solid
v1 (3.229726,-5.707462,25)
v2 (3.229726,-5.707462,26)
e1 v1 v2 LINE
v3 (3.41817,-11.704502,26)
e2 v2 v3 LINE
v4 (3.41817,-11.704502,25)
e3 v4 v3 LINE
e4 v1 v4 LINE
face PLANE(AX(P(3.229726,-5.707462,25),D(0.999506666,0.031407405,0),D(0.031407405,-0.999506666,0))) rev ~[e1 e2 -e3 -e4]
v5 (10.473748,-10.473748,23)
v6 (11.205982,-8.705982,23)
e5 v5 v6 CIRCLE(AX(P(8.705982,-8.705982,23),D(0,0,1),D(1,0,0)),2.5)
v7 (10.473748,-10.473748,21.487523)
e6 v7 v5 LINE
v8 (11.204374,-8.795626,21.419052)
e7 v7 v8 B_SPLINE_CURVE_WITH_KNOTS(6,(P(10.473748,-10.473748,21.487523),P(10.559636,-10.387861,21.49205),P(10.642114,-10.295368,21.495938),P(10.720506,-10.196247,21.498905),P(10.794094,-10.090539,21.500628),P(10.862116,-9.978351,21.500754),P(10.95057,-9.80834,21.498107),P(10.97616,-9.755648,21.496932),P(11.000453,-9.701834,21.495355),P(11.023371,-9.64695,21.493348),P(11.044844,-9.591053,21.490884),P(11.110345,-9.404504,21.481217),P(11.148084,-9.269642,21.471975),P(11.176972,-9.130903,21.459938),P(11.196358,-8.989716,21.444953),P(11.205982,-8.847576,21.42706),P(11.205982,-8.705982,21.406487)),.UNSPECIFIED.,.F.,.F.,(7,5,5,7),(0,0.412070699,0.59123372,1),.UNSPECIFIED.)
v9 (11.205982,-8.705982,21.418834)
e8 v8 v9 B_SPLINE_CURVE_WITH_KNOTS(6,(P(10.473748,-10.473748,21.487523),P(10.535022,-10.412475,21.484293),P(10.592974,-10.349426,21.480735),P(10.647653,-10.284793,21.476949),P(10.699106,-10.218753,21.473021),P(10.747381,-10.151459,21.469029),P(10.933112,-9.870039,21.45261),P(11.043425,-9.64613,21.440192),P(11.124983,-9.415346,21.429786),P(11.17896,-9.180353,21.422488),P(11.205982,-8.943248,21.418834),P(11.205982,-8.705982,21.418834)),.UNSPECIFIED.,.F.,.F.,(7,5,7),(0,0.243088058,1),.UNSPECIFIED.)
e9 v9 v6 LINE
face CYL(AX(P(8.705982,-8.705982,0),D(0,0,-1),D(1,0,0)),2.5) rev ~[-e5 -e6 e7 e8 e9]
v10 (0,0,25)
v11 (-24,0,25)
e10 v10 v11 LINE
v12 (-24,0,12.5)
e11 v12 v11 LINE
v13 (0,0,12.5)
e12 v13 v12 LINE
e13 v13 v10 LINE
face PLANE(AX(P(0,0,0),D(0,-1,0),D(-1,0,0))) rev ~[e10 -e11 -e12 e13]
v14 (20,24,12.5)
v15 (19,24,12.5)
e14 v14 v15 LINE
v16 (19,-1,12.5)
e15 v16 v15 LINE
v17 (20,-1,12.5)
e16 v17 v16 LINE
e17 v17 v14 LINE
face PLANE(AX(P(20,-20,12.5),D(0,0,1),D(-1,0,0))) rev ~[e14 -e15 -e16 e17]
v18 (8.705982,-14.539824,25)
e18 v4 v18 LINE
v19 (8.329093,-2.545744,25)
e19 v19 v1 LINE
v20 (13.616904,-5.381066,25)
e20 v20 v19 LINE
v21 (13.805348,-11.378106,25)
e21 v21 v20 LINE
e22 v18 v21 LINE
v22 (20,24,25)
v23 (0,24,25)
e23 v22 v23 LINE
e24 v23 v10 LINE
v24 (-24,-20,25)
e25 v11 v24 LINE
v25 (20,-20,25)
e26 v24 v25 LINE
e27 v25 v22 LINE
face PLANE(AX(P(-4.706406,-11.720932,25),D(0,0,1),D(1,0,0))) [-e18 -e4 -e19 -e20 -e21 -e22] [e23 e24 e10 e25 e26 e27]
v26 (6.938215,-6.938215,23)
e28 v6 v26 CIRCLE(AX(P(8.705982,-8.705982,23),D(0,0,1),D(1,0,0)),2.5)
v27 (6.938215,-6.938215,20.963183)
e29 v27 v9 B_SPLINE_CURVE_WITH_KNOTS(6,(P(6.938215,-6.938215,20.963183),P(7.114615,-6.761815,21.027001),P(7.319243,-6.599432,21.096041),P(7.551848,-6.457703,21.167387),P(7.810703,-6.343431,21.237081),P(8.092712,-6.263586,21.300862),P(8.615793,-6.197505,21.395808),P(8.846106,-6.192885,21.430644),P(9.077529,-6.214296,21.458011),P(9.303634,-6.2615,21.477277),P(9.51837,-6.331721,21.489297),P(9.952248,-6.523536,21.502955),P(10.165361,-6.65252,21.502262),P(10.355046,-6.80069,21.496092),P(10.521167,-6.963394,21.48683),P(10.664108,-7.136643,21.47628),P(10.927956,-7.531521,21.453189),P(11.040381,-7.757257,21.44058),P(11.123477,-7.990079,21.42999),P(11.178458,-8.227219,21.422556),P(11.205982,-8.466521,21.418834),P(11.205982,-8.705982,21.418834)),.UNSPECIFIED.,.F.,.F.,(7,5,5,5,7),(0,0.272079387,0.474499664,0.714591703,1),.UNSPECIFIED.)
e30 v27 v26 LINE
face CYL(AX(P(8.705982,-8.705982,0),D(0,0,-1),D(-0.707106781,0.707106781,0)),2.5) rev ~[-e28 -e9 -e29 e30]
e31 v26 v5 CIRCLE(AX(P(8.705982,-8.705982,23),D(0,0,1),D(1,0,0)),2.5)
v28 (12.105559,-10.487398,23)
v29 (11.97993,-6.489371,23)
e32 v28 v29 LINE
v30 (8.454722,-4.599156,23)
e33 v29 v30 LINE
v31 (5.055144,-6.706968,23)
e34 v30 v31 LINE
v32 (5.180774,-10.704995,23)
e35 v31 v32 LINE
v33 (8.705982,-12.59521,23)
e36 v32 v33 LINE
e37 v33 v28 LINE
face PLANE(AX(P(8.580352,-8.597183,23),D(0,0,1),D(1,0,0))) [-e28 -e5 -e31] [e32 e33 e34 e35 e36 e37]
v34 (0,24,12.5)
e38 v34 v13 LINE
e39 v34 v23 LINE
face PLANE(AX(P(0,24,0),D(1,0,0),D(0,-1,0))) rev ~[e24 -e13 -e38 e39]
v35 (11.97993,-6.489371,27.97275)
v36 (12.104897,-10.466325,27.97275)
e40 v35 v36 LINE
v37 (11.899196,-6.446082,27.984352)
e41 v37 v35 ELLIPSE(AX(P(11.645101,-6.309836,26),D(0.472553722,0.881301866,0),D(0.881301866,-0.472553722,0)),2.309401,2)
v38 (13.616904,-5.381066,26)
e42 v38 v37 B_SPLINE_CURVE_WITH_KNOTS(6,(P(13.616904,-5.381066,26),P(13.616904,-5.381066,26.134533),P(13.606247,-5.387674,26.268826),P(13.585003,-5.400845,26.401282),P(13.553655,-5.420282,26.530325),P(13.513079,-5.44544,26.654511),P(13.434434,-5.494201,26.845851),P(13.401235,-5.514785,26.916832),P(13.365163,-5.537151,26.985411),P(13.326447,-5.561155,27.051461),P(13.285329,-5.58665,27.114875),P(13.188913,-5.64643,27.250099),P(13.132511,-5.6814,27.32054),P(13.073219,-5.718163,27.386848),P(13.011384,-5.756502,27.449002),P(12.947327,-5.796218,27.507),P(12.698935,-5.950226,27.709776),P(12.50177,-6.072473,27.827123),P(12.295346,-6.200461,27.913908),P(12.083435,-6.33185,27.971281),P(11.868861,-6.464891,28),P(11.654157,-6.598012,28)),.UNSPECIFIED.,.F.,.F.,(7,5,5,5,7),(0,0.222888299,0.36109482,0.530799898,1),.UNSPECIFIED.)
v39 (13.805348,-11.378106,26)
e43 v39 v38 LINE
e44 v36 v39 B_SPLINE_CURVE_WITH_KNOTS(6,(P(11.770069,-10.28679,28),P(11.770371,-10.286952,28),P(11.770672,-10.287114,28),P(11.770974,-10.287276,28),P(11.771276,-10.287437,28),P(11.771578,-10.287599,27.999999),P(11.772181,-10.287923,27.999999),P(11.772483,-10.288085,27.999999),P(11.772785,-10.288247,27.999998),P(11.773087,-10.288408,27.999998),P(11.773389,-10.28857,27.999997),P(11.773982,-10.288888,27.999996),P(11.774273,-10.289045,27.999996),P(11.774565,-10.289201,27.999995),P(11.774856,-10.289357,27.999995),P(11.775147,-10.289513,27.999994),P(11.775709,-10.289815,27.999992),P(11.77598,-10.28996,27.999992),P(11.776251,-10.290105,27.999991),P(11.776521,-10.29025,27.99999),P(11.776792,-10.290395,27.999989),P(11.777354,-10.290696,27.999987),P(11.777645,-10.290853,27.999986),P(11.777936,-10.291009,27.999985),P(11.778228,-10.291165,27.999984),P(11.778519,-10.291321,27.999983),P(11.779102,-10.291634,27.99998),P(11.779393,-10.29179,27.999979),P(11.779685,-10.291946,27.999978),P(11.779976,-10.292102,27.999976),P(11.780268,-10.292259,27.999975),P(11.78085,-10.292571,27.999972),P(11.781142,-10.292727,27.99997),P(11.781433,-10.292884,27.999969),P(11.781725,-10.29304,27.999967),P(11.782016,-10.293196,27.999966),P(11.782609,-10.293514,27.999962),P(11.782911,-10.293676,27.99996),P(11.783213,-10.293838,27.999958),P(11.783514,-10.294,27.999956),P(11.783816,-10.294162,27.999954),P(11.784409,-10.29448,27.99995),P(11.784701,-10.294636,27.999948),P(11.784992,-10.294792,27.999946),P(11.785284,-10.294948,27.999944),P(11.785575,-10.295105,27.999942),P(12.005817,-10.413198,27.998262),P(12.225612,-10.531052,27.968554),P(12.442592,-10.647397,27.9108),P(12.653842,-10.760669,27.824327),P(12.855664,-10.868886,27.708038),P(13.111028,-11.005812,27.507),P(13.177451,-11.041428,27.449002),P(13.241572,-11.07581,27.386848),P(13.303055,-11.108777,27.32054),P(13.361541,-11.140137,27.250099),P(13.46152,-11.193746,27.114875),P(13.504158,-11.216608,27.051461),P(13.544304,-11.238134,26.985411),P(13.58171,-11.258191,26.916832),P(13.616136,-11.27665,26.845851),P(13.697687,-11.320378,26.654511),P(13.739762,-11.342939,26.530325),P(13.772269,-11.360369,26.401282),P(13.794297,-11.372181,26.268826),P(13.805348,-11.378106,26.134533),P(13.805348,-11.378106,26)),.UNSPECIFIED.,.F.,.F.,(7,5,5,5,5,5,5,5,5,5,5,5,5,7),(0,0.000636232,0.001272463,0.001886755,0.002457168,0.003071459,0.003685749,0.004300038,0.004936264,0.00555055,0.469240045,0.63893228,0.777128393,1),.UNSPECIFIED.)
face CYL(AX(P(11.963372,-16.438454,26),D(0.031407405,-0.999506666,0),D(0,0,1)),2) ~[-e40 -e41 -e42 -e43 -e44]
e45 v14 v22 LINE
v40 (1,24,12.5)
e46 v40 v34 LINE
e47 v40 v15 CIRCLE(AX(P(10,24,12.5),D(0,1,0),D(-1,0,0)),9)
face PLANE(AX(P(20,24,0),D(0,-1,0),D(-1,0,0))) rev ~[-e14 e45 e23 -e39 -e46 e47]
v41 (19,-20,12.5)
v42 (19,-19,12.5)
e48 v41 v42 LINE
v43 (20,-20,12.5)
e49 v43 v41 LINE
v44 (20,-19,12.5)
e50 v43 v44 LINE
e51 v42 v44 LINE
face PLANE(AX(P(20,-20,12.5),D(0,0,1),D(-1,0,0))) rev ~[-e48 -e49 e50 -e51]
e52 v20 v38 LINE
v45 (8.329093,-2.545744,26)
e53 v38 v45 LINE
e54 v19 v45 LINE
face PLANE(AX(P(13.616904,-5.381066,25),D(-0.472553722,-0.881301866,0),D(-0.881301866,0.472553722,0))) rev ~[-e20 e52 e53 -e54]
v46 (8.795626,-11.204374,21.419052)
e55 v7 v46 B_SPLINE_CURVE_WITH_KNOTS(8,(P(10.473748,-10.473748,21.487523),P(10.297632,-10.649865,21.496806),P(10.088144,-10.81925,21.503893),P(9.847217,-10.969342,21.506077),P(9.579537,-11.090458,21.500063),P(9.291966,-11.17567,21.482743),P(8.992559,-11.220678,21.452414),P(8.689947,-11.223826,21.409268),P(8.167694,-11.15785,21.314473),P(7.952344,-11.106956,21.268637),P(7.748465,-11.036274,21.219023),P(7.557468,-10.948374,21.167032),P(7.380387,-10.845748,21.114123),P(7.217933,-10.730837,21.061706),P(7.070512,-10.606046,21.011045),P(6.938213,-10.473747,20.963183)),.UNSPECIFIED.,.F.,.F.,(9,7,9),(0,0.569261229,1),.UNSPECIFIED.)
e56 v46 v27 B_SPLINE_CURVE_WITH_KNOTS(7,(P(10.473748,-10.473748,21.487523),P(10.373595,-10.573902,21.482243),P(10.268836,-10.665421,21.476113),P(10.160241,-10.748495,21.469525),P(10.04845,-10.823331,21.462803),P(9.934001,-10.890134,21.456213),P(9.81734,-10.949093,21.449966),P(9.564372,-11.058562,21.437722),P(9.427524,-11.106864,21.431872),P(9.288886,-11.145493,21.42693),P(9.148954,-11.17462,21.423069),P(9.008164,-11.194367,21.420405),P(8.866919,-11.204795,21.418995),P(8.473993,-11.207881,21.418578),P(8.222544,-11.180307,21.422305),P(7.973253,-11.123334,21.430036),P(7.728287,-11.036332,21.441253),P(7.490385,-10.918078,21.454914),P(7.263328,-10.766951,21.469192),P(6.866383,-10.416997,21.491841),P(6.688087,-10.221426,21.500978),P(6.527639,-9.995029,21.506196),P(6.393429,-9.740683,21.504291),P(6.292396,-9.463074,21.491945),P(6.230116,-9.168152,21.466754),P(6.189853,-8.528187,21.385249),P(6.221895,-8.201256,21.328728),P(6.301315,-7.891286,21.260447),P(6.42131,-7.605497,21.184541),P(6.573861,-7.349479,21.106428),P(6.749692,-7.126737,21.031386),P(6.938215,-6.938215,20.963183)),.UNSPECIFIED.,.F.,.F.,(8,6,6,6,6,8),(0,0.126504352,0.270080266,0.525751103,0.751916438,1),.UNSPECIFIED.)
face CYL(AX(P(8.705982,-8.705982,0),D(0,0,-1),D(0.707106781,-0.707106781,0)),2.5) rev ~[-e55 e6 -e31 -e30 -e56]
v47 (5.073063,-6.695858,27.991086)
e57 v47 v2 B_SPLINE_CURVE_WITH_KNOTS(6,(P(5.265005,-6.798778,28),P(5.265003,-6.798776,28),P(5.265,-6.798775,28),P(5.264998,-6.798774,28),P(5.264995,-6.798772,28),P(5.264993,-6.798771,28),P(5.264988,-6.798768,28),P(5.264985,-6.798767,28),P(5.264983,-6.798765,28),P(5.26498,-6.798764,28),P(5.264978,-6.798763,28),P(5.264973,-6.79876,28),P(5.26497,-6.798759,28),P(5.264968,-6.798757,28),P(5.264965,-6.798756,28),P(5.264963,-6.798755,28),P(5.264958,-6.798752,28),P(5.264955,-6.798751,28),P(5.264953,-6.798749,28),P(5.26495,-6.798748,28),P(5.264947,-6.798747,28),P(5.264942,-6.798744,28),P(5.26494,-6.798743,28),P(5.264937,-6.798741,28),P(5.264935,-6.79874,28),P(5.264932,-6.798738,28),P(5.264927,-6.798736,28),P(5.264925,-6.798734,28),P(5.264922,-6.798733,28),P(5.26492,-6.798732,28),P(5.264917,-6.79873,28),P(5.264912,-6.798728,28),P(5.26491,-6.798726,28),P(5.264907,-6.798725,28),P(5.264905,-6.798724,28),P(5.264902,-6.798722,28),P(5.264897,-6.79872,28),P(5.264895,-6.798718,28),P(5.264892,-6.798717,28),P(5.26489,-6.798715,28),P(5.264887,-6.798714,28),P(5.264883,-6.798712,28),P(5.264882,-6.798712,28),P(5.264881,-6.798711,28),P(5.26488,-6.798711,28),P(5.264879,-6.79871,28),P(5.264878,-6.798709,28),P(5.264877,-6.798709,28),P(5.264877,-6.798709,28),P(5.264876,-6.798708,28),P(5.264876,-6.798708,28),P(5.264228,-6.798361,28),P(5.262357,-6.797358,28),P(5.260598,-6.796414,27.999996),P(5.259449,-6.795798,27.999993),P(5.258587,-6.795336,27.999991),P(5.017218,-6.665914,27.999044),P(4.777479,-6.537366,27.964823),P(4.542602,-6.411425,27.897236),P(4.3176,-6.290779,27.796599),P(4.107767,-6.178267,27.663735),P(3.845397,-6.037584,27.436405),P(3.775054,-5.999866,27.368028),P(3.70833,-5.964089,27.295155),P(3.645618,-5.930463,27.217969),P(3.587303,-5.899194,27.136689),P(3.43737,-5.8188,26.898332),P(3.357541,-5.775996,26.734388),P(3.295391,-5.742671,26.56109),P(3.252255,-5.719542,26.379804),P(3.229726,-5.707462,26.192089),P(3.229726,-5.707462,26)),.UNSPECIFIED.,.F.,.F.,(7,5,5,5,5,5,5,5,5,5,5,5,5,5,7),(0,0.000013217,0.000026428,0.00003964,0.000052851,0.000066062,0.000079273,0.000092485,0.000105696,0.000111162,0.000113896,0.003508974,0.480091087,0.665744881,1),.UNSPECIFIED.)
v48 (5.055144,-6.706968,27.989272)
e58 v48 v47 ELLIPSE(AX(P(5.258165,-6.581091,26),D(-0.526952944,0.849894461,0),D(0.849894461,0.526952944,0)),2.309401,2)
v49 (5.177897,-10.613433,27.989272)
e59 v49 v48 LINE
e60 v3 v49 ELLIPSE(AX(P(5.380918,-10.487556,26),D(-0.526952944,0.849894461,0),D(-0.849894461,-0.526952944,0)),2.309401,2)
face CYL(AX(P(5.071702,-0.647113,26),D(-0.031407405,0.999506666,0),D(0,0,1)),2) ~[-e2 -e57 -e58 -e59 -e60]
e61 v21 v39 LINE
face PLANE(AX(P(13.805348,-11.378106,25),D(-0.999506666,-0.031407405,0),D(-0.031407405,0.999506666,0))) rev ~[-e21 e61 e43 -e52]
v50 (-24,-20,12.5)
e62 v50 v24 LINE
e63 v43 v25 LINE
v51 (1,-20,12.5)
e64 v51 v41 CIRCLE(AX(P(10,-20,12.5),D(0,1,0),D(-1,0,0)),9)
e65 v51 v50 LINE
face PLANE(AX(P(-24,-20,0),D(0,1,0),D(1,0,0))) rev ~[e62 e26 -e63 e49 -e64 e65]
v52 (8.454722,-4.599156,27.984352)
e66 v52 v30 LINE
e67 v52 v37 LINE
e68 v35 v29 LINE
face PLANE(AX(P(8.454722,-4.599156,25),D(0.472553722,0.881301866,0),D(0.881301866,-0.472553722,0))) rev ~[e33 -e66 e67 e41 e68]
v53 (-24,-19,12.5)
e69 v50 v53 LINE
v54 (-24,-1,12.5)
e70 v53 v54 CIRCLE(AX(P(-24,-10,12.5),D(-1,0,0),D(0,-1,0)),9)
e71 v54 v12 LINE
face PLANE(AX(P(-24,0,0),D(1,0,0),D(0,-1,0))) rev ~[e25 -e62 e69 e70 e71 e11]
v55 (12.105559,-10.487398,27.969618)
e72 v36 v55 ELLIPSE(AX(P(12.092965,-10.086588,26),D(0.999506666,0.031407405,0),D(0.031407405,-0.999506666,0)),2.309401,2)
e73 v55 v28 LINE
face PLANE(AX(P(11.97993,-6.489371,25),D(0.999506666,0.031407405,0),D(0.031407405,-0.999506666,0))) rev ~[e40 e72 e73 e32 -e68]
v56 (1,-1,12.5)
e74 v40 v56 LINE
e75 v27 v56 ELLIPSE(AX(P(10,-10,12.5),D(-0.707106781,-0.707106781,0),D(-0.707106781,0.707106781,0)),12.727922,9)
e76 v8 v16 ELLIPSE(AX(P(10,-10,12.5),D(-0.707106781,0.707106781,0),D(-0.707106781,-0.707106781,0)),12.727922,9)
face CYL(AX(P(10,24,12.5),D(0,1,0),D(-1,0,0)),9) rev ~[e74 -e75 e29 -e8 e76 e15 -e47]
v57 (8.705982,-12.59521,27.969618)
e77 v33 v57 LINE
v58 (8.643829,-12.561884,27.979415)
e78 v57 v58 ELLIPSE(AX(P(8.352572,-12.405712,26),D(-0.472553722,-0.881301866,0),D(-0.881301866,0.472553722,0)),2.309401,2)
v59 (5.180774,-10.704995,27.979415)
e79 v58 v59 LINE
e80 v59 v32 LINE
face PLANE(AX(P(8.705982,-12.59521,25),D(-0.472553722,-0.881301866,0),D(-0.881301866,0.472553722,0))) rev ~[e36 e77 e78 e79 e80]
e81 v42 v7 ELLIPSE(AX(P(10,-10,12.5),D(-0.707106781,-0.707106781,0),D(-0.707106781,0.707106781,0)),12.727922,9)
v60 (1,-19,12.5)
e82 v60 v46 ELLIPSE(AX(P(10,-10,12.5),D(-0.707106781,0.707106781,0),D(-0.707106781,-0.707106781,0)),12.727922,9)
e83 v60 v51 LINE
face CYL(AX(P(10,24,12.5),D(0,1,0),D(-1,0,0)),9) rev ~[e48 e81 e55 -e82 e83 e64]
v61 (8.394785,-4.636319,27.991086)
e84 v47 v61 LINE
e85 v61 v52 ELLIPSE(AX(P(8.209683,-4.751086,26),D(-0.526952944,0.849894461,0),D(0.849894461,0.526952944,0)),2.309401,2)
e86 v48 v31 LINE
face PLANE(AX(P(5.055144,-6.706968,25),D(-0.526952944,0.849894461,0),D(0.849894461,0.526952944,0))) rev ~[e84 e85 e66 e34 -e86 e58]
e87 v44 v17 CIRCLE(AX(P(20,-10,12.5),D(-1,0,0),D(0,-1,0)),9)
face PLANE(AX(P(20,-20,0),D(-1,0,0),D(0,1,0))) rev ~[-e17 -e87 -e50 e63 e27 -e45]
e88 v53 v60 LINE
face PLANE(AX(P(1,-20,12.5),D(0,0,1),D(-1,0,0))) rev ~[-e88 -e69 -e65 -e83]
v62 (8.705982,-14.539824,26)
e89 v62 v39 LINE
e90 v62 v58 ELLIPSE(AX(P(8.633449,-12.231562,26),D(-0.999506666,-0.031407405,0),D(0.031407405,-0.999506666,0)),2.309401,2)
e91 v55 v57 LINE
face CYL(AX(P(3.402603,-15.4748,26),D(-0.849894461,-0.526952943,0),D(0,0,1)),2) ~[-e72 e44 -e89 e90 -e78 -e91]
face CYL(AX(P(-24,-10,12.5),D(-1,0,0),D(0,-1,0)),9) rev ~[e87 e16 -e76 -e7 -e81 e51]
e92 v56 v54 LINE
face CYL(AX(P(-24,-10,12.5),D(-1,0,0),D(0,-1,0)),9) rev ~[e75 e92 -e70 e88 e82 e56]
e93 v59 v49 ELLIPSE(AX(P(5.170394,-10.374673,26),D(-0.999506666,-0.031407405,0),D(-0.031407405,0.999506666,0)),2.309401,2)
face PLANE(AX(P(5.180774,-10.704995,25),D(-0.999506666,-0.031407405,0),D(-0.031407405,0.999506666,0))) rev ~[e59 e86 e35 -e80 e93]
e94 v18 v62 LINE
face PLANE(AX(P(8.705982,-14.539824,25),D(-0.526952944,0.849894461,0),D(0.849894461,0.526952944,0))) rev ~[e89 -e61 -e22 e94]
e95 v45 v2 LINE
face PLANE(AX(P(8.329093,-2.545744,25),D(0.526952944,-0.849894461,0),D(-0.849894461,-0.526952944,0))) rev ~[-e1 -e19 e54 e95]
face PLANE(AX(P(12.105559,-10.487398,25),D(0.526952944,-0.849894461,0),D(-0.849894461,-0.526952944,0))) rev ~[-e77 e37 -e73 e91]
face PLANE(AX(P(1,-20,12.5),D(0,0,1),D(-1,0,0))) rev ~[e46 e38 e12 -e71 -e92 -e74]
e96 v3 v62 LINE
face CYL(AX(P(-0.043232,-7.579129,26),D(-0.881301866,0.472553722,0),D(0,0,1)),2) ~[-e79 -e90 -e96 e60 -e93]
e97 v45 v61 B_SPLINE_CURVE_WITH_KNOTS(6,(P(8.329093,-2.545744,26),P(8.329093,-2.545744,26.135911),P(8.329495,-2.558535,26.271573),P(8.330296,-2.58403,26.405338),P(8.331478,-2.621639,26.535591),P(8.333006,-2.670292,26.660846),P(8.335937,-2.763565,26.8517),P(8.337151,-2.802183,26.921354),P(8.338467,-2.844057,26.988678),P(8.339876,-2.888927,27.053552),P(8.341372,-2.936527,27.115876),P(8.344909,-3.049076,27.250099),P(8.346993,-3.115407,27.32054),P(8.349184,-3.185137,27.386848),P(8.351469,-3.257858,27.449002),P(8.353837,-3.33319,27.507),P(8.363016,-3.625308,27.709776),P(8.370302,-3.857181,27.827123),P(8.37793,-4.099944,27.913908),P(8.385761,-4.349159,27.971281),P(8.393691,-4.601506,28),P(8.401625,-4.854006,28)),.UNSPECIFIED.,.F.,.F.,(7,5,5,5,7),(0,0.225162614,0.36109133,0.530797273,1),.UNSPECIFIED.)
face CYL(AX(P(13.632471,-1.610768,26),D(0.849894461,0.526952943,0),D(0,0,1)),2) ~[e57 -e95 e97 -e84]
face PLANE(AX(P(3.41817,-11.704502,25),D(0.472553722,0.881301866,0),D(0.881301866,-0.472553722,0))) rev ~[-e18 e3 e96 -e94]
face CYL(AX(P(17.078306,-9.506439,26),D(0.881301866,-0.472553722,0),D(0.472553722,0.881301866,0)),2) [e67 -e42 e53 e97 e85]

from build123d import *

# Parameters (mm, degrees)
F1_DEPTH      = 25
F2_R          = 9
F3_DEPTH      = 44.001
F4_R          = 9
F5_DEPTH      = 44.001
F7_DEPTH      = 44.0010001
F8_R          = 2.5
F9_DEPTH      = 2
F10_DEPTH     = 3
F11_T1_DEPTH  = 16
F11_T3_DEPTH  = 16
F11_T5_DEPTH  = 16
F11_T7_DEPTH  = 16
F11_T9_DEPTH  = 16
F11_T11_DEPTH = 16


# Not quite as in the source:
# - a fillet or chamfer that OpenCascade refuses, or shapes differently, is made with other operations: its cross-section is extruded or revolved along the edge and cut away or added


with BuildPart() as f1:
    # F0 (on Top) → F1 (new body)
    with BuildSketch(Plane.XY):
        with BuildLine():
            Line((6.9382145885, -6.9382145885), (0, 0))
            Line((0, 0), (-24, 0))
            Line((-24, 0), (-24, -20))
            Line((-24, -20), (20, -20))
            Line((20, -20), (10.4737484944, -10.4737484944))
            ThreePointArc((10.4737484944, -10.4737484944), (6.9382145885, -10.4737484944), (6.9382145885, -6.9382145885))
        make_face()
        with BuildLine():
            Line((20, 24), (0, 24))
            Line((0, 24), (0, 0))
            Line((0, 0), (6.9382145885, -6.9382145885))
            ThreePointArc((6.9382145885, -6.9382145885), (9.6626901223, -6.3962827101), (11.2059815414, -8.7059815414))
            ThreePointArc((11.2059815414, -8.7059815414), (11.0156803727, -9.6626901223), (10.4737484944, -10.4737484944))
            Line((10.4737484944, -10.4737484944), (20, -20))
            Line((20, -20), (20, 24))
        make_face()
    extrude(amount=F1_DEPTH)

    # F2 (on face) → F3 (cut, through all)
    with BuildSketch(Plane(origin=(-24, 0, 0), x_dir=(0, -1, 0), z_dir=(-1, 0, 0))):
        with Locations((10, 12.5)):
            Circle(F2_R)
    extrude(amount=-F3_DEPTH, mode=Mode.SUBTRACT)

    # F4 (on face) → F5 (cut, through all)
    with BuildSketch(Plane(origin=(0, 24, 0), x_dir=(-1, 0, 0), z_dir=(0, 1, 0))):
        with Locations((-10, 12.5)):
            Circle(F4_R)
    extrude(amount=-F5_DEPTH, mode=Mode.SUBTRACT)

    # F6 (on face) → F7 (cut, through all)
    with BuildSketch(Plane.XZ.offset(20)):
        with BuildLine():
            Line((20, 12.5), (19, 12.5))
            ThreePointArc((19, 12.5), (10, 3.5), (1, 12.5))
            Line((1, 12.5), (-24, 12.5))
            Line((-24, 12.5), (-24, 0))
            Line((-24, 0), (20, 0))
            Line((20, 0), (20, 12.5))
        make_face()
    extrude(amount=-F7_DEPTH, mode=Mode.SUBTRACT)

    # F8 (on face) → F9 (cut)
    with BuildSketch(Plane.XY.offset(25)):
        Polygon((5.0551444558, -6.7069682099), (5.1807740761, -10.704994873), (8.7059815414, -12.5952097618), (12.1055593865, -10.4873979877), (11.9799297662, -6.4893713246), (8.4547223009, -4.5991564357), align=None)
        with Locations((8.7059815414, -8.7059815414)):
            Circle(F8_R, mode=Mode.SUBTRACT)
    extrude(amount=-F9_DEPTH, mode=Mode.SUBTRACT)

    # F8 (on face) → F10 (join)
    with BuildSketch(Plane.XY.offset(25)):
        Polygon((3.229725913, -5.7074615441), (3.4181703434, -11.7045015387), (8.7059815414, -14.5398238721), (13.805348309, -11.3781062108), (13.6169038786, -5.3810662162), (8.3290926806, -2.5457438829), align=None)
        Polygon((8.7059815414, -12.5952097618), (5.1807740761, -10.704994873), (5.0551444558, -6.7069682099), (8.4547223009, -4.5991564357), (11.9799297662, -6.4893713246), (12.1055593865, -10.4873979877), align=None, mode=Mode.SUBTRACT)
    extrude(amount=F10_DEPTH)

    # F11: fillet of radius 2 on 6 edges, made by hand

    # F11_s2 → F11_t1 (cut)
    with BuildSketch(Plane(origin=(17.2236751454, -9.2353279974, 0), x_dir=(0, 0, 1), z_dir=(-0.8813018663, 0.4725537222, 0))):
        with BuildLine():
            ThreePointArc((26, 1.6923749137), (27.4142135624, 1.1065884761), (28, -0.3076250863))
            Line((28, -0.3076250863), (28, 1.6923749137))
            Line((28, 1.6923749137), (26, 1.6923749137))
        make_face()
    extrude(amount=F11_T1_DEPTH, mode=Mode.SUBTRACT)

    # F11_s4 → F11_t3 (cut)
    with BuildSketch(Plane(origin=(0.5278354617, -16.7977921518, 0), x_dir=(0, 0, 1), z_dir=(-0.0314074051, 0.9995066658, 0))):
        with BuildLine():
            ThreePointArc((28, 11.4411808674), (27.4142135624, 12.8553944297), (26, 13.4411808674))
            Line((26, 13.4411808674), (28, 13.4411808674))
            Line((28, 13.4411808674), (28, 11.4411808674))
        make_face()
    extrude(amount=F11_T3_DEPTH, mode=Mode.SUBTRACT)

    # F11_s6 → F11_t5 (cut)
    with BuildSketch(Plane(origin=(-4.4726864595, -2.7731623193, 0), x_dir=(0, 0, 1), z_dir=(0.8498944613, 0.5269529435, 0))):
        with BuildLine():
            ThreePointArc((28, 14.9449583763), (27.4142135624, 16.3591719387), (26, 16.9449583763))
            Line((26, 16.9449583763), (28, 16.9449583763))
            Line((28, 16.9449583763), (28, 14.9449583763))
        make_face()
    extrude(amount=F11_T5_DEPTH, mode=Mode.SUBTRACT)

    # F11_s8 → F11_t7 (cut)
    with BuildSketch(Plane(origin=(3.122845284, -1.6744684418, 0), x_dir=(0, 0, 1), z_dir=(0.8813018663, -0.4725537222, 0))):
        with BuildLine():
            ThreePointArc((28, 6.6999299317), (27.4142135624, 8.1141434941), (26, 8.6999299317))
            Line((26, 8.6999299317), (28, 8.6999299317))
            Line((28, 8.6999299317), (28, 6.6999299317))
        make_face()
    extrude(amount=F11_T7_DEPTH, mode=Mode.SUBTRACT)

    # F11_s10 → F11_t9 (cut)
    with BuildSketch(Plane(origin=(0.0253169806, -0.8056854995, 0), x_dir=(0, 0, 1), z_dir=(0.0314074051, -0.9995066658, 0))):
        with BuildLine():
            ThreePointArc((28, -5.048876022), (27.4142135624, -3.6346624596), (26, -3.048876022))
            Line((26, -3.048876022), (28, -3.048876022))
            Line((28, -3.048876022), (28, -5.048876022))
        make_face()
    extrude(amount=F11_T9_DEPTH, mode=Mode.SUBTRACT)

    # F11_s12 → F11_t11 (cut)
    with BuildSketch(Plane(origin=(9.1256249208, 5.6580847774, 0), x_dir=(0, 0, 1), z_dir=(-0.8498944613, -0.5269529435, 0))):
        with BuildLine():
            ThreePointArc((28, -8.5526535309), (27.4142135624, -7.1384399686), (26, -6.5526535309))
            Line((26, -6.5526535309), (28, -6.5526535309))
            Line((28, -6.5526535309), (28, -8.5526535309))
        make_face()
    extrude(amount=F11_T11_DEPTH, mode=Mode.SUBTRACT)


solid = f1.part
